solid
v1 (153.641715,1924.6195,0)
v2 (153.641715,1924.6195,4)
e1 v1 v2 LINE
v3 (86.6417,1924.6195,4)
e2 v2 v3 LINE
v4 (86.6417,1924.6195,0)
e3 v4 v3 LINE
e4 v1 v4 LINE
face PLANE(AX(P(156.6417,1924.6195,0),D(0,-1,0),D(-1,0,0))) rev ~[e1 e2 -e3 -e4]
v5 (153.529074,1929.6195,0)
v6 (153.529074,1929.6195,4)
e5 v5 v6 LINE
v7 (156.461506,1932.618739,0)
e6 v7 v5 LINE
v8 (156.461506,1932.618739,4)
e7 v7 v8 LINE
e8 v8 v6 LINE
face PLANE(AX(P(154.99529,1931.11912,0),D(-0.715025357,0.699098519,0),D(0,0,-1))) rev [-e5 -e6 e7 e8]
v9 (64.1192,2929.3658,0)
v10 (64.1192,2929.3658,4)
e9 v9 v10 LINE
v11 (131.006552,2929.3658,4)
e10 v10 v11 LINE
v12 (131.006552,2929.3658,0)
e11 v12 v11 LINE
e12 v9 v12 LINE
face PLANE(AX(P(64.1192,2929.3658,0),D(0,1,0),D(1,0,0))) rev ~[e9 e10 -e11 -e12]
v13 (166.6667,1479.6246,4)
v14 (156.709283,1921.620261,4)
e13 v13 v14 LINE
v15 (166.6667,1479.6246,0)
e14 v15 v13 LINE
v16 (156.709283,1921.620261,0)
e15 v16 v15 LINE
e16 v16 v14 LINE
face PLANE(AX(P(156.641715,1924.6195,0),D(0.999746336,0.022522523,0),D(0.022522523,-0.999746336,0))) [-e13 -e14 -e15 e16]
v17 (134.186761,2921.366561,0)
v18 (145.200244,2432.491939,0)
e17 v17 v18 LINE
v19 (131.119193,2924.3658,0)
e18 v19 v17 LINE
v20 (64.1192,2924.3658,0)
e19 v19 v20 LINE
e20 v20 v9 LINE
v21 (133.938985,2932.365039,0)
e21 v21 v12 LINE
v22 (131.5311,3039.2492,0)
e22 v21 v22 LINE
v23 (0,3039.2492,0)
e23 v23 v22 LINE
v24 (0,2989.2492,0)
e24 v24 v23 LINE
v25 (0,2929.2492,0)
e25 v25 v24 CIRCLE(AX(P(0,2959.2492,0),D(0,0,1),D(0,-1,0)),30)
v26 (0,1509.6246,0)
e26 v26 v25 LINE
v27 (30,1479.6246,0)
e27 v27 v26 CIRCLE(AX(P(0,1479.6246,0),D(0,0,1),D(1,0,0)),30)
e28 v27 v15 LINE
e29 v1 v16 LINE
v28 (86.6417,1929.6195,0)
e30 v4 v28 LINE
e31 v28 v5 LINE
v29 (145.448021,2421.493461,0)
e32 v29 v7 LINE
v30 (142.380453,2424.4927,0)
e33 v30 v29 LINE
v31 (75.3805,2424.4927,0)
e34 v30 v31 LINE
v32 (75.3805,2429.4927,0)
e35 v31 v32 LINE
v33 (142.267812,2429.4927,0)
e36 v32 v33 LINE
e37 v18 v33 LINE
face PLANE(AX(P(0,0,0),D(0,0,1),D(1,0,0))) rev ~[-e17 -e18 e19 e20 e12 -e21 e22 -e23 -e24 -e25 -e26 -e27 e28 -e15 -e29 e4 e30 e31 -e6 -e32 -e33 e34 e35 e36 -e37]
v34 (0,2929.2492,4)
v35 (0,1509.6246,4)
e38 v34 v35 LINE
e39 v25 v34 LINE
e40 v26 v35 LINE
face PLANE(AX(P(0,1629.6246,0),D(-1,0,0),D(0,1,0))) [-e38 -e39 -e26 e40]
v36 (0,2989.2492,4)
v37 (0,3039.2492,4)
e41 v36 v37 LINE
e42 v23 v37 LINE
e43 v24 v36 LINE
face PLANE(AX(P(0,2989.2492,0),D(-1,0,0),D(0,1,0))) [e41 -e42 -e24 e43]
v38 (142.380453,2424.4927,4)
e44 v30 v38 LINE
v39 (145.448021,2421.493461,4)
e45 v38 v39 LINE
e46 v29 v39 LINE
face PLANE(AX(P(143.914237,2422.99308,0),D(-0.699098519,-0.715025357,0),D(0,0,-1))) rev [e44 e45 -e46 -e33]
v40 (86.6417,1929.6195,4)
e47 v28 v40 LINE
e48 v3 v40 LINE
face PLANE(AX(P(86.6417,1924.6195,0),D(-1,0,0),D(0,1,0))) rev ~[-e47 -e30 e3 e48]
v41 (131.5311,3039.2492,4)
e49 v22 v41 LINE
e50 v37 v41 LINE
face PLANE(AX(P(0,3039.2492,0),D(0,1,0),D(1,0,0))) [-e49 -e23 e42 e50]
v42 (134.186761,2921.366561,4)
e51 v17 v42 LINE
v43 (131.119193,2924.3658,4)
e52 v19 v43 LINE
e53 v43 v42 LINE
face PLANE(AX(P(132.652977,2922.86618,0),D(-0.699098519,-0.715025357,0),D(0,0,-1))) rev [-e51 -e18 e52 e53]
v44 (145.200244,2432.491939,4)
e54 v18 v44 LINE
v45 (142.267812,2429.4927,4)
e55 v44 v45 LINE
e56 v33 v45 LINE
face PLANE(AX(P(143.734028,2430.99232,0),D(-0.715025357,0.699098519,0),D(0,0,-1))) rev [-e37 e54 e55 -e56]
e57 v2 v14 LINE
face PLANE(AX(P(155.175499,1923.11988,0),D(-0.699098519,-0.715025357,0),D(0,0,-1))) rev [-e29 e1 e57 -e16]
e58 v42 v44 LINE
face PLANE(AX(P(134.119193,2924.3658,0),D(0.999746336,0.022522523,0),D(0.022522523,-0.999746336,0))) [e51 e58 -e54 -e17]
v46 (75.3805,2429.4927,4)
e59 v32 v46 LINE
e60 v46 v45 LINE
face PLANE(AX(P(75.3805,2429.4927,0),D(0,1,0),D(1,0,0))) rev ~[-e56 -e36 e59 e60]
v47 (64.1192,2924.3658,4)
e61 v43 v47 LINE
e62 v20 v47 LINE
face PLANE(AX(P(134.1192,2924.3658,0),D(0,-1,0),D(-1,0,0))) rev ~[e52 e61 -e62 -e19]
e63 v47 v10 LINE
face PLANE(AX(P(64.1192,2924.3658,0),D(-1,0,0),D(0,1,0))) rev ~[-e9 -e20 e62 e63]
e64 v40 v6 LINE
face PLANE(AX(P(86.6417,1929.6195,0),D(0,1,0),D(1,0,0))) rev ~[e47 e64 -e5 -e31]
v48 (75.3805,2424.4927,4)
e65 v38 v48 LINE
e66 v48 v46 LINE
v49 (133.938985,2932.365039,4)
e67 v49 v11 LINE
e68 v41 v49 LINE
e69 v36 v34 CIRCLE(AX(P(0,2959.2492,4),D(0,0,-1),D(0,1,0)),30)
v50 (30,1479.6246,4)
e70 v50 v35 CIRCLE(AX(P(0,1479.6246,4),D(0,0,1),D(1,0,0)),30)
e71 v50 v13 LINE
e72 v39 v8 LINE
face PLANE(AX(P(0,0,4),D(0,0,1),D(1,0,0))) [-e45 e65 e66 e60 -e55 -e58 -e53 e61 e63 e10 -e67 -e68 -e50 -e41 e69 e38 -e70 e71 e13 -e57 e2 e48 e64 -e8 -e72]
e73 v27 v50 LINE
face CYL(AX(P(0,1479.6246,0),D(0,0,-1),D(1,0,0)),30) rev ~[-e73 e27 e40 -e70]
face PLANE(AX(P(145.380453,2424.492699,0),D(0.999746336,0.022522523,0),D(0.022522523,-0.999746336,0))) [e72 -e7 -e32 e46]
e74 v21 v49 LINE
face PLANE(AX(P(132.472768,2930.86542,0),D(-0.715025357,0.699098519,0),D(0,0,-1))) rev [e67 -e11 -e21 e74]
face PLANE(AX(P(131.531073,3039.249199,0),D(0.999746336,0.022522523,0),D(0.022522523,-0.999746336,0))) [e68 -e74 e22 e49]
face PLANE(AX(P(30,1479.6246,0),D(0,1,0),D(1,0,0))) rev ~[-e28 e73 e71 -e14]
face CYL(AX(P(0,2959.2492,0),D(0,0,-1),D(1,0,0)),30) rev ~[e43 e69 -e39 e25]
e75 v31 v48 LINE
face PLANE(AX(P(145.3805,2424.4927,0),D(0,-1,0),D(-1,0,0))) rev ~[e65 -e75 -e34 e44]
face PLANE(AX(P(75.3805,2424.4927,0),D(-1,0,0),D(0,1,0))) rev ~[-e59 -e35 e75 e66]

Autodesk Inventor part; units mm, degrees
ref_plane "YZ Plane" through (0, 0, 0) normal (1, 0, 0) x (0, 1, 0)
ref_plane "XZ Plane" through (0, 0, 0) normal (0, 1, 0) x (-1, 0, 0)
ref_plane "XY Plane" through (0, 0, 0) normal (0, 0, 1) x (1, 0, 0)
sketch "Sketch1" plane through (0, 0, 0) normal (0, 0, 1) x (1, 0, 0)
  line L0 (0, 0) -> (0, 4438.8737)
  line L1 (0, 4438.8737) -> (100, 4438.8737)
  line L2 (100, 4438.8737) -> (200, 0)
  line L3 (200, 0) -> (0, 0)
  circle A0 centre (0, 0) radius 30
  line L4 (0, 1479.6246) -> (166.6667, 1479.6246)
  line L5 (0, 2959.2492) -> (133.3333, 2959.2492)
  circle A1 centre (0, 1479.6246) radius 30
  circle A2 centre (0, 2959.2492) radius 30
  line L6 (190.4255, 425) -> (120.4255, 425)
  line L7 (120.4255, 425) -> (120.4255, 430)
  line L8 (120.4255, 430) -> (190.4255, 430)
  line L9 (190.4255, 430) -> (190.4255, 425)
  line L10 (109.1642, 929.8732) -> (179.1642, 929.8732)
  line L11 (179.1642, 924.8732) -> (109.1642, 924.8732)
  line L12 (109.1642, 924.8732) -> (109.1642, 929.8732)
  line L13 (179.1642, 929.8732) -> (179.1642, 924.8732)
  line L14 (97.903, 1429.7463) -> (167.903, 1429.7463)
  line L15 (167.903, 1424.7463) -> (97.903, 1424.7463)
  line L16 (97.903, 1424.7463) -> (97.903, 1429.7463)
  line L17 (167.903, 1429.7463) -> (167.903, 1424.7463)
  line L18 (86.6417, 1929.6195) -> (156.6417, 1929.6195)
  line L19 (156.6417, 1924.6195) -> (86.6417, 1924.6195)
  line L20 (86.6417, 1924.6195) -> (86.6417, 1929.6195)
  line L21 (156.6417, 1929.6195) -> (156.6417, 1924.6195)
  line L22 (75.3805, 2429.4927) -> (145.3805, 2429.4927)
  line L23 (145.3805, 2424.4927) -> (75.3805, 2424.4927)
  line L24 (75.3805, 2424.4927) -> (75.3805, 2429.4927)
  line L25 (145.3805, 2429.4927) -> (145.3805, 2424.4927)
  line L26 (64.1192, 2929.3658) -> (134.1192, 2929.3658)
  line L27 (134.1192, 2924.3658) -> (64.1192, 2924.3658)
  line L28 (64.1192, 2924.3658) -> (64.1192, 2929.3658)
  line L29 (134.1192, 2929.3658) -> (134.1192, 2924.3658)
  line L30 (52.8579, 3429.239) -> (122.8579, 3429.239)
  line L31 (122.8579, 3424.239) -> (52.8579, 3424.239)
  line L32 (52.8579, 3424.239) -> (52.8579, 3429.239)
  line L33 (122.8579, 3429.239) -> (122.8579, 3424.239)
  line L34 (41.5967, 3929.1122) -> (111.5967, 3929.1122)
  line L35 (111.5967, 3924.1122) -> (41.5967, 3924.1122)
  line L36 (41.5967, 3924.1122) -> (41.5967, 3929.1122)
  line L37 (111.5967, 3929.1122) -> (111.5967, 3924.1122)
  line L38 (0, 1629.6246) -> (163.2874, 1629.6246)
  line L39 (0, 3039.2492) -> (131.5311, 3039.2492)
  point P0 (30, 2959.2492)
  point P1 (0, 2929.2492)
  point P2 (0, 1509.6246)
  point P3 (0, 1449.6246)
  point P4 (0, 30)
  point P5 (30, 0)
  point P6 (190.3129, 430)
  point P7 (179.0516, 929.8732)
  point P8 (167.7903, 1429.7463)
  point P9 (30, 1479.6246)
  point P10 (156.5291, 1929.6195)
  point P11 (145.2678, 2429.4927)
  point P12 (134.0066, 2929.3658)
  point P13 (0, 2989.2492)
  dimension "d65" = 100
  dimension "d67" = 200
  dimension "d68" = 60
  dimension "d69" = 1480
  dimension "d70" = 1480
  dimension "d71" = 1480
  dimension "d72" = 5
  dimension "d73" = 70
  dimension "d74" = 430
  dimension "d77" = 500
  dimension "d82" = 80
  dimension "d83" = 150
extrude "Plate3" add sketch "Sketch1" along normal blind 4 contours L39 L2 L5 A2 L0 | L5 L2 L26 L28 L27 L22 L24 L23 L18 L20 L19 L38 L0 A2 | L38 L2 L4 A1 L0
chamfer "Corner Chamfer2" distance 3 angle 45 6 edges at (156.6417, 1924.6195, 2) (156.5291, 1929.6195, 2) (145.3805, 2424.4927, 2) (145.2678, 2429.4927, 2) (134.1192, 2924.3658, 2) (134.0066, 2929.3658, 2)
equation "\"BendRadius\" = Thickness"
equation "\"BendReliefWidth\" = Thickness"
equation "\"BendReliefDepth\" = 0.5 * Thickness"
equation "\"CornerReliefSize\" = 4 * Thickness"
equation "\"MinimumRemnant\" = 2 * Thickness"
equation "\"TransitionRadius\" = BendRadius"
equation "\"JacobiRadiusSize\" = BendRadius"
equation "\"GapSize\" = Thickness"
equation "\"Thickness\" = 4"
properties part number "0711 GBK Center rib 2" material "Steel"
